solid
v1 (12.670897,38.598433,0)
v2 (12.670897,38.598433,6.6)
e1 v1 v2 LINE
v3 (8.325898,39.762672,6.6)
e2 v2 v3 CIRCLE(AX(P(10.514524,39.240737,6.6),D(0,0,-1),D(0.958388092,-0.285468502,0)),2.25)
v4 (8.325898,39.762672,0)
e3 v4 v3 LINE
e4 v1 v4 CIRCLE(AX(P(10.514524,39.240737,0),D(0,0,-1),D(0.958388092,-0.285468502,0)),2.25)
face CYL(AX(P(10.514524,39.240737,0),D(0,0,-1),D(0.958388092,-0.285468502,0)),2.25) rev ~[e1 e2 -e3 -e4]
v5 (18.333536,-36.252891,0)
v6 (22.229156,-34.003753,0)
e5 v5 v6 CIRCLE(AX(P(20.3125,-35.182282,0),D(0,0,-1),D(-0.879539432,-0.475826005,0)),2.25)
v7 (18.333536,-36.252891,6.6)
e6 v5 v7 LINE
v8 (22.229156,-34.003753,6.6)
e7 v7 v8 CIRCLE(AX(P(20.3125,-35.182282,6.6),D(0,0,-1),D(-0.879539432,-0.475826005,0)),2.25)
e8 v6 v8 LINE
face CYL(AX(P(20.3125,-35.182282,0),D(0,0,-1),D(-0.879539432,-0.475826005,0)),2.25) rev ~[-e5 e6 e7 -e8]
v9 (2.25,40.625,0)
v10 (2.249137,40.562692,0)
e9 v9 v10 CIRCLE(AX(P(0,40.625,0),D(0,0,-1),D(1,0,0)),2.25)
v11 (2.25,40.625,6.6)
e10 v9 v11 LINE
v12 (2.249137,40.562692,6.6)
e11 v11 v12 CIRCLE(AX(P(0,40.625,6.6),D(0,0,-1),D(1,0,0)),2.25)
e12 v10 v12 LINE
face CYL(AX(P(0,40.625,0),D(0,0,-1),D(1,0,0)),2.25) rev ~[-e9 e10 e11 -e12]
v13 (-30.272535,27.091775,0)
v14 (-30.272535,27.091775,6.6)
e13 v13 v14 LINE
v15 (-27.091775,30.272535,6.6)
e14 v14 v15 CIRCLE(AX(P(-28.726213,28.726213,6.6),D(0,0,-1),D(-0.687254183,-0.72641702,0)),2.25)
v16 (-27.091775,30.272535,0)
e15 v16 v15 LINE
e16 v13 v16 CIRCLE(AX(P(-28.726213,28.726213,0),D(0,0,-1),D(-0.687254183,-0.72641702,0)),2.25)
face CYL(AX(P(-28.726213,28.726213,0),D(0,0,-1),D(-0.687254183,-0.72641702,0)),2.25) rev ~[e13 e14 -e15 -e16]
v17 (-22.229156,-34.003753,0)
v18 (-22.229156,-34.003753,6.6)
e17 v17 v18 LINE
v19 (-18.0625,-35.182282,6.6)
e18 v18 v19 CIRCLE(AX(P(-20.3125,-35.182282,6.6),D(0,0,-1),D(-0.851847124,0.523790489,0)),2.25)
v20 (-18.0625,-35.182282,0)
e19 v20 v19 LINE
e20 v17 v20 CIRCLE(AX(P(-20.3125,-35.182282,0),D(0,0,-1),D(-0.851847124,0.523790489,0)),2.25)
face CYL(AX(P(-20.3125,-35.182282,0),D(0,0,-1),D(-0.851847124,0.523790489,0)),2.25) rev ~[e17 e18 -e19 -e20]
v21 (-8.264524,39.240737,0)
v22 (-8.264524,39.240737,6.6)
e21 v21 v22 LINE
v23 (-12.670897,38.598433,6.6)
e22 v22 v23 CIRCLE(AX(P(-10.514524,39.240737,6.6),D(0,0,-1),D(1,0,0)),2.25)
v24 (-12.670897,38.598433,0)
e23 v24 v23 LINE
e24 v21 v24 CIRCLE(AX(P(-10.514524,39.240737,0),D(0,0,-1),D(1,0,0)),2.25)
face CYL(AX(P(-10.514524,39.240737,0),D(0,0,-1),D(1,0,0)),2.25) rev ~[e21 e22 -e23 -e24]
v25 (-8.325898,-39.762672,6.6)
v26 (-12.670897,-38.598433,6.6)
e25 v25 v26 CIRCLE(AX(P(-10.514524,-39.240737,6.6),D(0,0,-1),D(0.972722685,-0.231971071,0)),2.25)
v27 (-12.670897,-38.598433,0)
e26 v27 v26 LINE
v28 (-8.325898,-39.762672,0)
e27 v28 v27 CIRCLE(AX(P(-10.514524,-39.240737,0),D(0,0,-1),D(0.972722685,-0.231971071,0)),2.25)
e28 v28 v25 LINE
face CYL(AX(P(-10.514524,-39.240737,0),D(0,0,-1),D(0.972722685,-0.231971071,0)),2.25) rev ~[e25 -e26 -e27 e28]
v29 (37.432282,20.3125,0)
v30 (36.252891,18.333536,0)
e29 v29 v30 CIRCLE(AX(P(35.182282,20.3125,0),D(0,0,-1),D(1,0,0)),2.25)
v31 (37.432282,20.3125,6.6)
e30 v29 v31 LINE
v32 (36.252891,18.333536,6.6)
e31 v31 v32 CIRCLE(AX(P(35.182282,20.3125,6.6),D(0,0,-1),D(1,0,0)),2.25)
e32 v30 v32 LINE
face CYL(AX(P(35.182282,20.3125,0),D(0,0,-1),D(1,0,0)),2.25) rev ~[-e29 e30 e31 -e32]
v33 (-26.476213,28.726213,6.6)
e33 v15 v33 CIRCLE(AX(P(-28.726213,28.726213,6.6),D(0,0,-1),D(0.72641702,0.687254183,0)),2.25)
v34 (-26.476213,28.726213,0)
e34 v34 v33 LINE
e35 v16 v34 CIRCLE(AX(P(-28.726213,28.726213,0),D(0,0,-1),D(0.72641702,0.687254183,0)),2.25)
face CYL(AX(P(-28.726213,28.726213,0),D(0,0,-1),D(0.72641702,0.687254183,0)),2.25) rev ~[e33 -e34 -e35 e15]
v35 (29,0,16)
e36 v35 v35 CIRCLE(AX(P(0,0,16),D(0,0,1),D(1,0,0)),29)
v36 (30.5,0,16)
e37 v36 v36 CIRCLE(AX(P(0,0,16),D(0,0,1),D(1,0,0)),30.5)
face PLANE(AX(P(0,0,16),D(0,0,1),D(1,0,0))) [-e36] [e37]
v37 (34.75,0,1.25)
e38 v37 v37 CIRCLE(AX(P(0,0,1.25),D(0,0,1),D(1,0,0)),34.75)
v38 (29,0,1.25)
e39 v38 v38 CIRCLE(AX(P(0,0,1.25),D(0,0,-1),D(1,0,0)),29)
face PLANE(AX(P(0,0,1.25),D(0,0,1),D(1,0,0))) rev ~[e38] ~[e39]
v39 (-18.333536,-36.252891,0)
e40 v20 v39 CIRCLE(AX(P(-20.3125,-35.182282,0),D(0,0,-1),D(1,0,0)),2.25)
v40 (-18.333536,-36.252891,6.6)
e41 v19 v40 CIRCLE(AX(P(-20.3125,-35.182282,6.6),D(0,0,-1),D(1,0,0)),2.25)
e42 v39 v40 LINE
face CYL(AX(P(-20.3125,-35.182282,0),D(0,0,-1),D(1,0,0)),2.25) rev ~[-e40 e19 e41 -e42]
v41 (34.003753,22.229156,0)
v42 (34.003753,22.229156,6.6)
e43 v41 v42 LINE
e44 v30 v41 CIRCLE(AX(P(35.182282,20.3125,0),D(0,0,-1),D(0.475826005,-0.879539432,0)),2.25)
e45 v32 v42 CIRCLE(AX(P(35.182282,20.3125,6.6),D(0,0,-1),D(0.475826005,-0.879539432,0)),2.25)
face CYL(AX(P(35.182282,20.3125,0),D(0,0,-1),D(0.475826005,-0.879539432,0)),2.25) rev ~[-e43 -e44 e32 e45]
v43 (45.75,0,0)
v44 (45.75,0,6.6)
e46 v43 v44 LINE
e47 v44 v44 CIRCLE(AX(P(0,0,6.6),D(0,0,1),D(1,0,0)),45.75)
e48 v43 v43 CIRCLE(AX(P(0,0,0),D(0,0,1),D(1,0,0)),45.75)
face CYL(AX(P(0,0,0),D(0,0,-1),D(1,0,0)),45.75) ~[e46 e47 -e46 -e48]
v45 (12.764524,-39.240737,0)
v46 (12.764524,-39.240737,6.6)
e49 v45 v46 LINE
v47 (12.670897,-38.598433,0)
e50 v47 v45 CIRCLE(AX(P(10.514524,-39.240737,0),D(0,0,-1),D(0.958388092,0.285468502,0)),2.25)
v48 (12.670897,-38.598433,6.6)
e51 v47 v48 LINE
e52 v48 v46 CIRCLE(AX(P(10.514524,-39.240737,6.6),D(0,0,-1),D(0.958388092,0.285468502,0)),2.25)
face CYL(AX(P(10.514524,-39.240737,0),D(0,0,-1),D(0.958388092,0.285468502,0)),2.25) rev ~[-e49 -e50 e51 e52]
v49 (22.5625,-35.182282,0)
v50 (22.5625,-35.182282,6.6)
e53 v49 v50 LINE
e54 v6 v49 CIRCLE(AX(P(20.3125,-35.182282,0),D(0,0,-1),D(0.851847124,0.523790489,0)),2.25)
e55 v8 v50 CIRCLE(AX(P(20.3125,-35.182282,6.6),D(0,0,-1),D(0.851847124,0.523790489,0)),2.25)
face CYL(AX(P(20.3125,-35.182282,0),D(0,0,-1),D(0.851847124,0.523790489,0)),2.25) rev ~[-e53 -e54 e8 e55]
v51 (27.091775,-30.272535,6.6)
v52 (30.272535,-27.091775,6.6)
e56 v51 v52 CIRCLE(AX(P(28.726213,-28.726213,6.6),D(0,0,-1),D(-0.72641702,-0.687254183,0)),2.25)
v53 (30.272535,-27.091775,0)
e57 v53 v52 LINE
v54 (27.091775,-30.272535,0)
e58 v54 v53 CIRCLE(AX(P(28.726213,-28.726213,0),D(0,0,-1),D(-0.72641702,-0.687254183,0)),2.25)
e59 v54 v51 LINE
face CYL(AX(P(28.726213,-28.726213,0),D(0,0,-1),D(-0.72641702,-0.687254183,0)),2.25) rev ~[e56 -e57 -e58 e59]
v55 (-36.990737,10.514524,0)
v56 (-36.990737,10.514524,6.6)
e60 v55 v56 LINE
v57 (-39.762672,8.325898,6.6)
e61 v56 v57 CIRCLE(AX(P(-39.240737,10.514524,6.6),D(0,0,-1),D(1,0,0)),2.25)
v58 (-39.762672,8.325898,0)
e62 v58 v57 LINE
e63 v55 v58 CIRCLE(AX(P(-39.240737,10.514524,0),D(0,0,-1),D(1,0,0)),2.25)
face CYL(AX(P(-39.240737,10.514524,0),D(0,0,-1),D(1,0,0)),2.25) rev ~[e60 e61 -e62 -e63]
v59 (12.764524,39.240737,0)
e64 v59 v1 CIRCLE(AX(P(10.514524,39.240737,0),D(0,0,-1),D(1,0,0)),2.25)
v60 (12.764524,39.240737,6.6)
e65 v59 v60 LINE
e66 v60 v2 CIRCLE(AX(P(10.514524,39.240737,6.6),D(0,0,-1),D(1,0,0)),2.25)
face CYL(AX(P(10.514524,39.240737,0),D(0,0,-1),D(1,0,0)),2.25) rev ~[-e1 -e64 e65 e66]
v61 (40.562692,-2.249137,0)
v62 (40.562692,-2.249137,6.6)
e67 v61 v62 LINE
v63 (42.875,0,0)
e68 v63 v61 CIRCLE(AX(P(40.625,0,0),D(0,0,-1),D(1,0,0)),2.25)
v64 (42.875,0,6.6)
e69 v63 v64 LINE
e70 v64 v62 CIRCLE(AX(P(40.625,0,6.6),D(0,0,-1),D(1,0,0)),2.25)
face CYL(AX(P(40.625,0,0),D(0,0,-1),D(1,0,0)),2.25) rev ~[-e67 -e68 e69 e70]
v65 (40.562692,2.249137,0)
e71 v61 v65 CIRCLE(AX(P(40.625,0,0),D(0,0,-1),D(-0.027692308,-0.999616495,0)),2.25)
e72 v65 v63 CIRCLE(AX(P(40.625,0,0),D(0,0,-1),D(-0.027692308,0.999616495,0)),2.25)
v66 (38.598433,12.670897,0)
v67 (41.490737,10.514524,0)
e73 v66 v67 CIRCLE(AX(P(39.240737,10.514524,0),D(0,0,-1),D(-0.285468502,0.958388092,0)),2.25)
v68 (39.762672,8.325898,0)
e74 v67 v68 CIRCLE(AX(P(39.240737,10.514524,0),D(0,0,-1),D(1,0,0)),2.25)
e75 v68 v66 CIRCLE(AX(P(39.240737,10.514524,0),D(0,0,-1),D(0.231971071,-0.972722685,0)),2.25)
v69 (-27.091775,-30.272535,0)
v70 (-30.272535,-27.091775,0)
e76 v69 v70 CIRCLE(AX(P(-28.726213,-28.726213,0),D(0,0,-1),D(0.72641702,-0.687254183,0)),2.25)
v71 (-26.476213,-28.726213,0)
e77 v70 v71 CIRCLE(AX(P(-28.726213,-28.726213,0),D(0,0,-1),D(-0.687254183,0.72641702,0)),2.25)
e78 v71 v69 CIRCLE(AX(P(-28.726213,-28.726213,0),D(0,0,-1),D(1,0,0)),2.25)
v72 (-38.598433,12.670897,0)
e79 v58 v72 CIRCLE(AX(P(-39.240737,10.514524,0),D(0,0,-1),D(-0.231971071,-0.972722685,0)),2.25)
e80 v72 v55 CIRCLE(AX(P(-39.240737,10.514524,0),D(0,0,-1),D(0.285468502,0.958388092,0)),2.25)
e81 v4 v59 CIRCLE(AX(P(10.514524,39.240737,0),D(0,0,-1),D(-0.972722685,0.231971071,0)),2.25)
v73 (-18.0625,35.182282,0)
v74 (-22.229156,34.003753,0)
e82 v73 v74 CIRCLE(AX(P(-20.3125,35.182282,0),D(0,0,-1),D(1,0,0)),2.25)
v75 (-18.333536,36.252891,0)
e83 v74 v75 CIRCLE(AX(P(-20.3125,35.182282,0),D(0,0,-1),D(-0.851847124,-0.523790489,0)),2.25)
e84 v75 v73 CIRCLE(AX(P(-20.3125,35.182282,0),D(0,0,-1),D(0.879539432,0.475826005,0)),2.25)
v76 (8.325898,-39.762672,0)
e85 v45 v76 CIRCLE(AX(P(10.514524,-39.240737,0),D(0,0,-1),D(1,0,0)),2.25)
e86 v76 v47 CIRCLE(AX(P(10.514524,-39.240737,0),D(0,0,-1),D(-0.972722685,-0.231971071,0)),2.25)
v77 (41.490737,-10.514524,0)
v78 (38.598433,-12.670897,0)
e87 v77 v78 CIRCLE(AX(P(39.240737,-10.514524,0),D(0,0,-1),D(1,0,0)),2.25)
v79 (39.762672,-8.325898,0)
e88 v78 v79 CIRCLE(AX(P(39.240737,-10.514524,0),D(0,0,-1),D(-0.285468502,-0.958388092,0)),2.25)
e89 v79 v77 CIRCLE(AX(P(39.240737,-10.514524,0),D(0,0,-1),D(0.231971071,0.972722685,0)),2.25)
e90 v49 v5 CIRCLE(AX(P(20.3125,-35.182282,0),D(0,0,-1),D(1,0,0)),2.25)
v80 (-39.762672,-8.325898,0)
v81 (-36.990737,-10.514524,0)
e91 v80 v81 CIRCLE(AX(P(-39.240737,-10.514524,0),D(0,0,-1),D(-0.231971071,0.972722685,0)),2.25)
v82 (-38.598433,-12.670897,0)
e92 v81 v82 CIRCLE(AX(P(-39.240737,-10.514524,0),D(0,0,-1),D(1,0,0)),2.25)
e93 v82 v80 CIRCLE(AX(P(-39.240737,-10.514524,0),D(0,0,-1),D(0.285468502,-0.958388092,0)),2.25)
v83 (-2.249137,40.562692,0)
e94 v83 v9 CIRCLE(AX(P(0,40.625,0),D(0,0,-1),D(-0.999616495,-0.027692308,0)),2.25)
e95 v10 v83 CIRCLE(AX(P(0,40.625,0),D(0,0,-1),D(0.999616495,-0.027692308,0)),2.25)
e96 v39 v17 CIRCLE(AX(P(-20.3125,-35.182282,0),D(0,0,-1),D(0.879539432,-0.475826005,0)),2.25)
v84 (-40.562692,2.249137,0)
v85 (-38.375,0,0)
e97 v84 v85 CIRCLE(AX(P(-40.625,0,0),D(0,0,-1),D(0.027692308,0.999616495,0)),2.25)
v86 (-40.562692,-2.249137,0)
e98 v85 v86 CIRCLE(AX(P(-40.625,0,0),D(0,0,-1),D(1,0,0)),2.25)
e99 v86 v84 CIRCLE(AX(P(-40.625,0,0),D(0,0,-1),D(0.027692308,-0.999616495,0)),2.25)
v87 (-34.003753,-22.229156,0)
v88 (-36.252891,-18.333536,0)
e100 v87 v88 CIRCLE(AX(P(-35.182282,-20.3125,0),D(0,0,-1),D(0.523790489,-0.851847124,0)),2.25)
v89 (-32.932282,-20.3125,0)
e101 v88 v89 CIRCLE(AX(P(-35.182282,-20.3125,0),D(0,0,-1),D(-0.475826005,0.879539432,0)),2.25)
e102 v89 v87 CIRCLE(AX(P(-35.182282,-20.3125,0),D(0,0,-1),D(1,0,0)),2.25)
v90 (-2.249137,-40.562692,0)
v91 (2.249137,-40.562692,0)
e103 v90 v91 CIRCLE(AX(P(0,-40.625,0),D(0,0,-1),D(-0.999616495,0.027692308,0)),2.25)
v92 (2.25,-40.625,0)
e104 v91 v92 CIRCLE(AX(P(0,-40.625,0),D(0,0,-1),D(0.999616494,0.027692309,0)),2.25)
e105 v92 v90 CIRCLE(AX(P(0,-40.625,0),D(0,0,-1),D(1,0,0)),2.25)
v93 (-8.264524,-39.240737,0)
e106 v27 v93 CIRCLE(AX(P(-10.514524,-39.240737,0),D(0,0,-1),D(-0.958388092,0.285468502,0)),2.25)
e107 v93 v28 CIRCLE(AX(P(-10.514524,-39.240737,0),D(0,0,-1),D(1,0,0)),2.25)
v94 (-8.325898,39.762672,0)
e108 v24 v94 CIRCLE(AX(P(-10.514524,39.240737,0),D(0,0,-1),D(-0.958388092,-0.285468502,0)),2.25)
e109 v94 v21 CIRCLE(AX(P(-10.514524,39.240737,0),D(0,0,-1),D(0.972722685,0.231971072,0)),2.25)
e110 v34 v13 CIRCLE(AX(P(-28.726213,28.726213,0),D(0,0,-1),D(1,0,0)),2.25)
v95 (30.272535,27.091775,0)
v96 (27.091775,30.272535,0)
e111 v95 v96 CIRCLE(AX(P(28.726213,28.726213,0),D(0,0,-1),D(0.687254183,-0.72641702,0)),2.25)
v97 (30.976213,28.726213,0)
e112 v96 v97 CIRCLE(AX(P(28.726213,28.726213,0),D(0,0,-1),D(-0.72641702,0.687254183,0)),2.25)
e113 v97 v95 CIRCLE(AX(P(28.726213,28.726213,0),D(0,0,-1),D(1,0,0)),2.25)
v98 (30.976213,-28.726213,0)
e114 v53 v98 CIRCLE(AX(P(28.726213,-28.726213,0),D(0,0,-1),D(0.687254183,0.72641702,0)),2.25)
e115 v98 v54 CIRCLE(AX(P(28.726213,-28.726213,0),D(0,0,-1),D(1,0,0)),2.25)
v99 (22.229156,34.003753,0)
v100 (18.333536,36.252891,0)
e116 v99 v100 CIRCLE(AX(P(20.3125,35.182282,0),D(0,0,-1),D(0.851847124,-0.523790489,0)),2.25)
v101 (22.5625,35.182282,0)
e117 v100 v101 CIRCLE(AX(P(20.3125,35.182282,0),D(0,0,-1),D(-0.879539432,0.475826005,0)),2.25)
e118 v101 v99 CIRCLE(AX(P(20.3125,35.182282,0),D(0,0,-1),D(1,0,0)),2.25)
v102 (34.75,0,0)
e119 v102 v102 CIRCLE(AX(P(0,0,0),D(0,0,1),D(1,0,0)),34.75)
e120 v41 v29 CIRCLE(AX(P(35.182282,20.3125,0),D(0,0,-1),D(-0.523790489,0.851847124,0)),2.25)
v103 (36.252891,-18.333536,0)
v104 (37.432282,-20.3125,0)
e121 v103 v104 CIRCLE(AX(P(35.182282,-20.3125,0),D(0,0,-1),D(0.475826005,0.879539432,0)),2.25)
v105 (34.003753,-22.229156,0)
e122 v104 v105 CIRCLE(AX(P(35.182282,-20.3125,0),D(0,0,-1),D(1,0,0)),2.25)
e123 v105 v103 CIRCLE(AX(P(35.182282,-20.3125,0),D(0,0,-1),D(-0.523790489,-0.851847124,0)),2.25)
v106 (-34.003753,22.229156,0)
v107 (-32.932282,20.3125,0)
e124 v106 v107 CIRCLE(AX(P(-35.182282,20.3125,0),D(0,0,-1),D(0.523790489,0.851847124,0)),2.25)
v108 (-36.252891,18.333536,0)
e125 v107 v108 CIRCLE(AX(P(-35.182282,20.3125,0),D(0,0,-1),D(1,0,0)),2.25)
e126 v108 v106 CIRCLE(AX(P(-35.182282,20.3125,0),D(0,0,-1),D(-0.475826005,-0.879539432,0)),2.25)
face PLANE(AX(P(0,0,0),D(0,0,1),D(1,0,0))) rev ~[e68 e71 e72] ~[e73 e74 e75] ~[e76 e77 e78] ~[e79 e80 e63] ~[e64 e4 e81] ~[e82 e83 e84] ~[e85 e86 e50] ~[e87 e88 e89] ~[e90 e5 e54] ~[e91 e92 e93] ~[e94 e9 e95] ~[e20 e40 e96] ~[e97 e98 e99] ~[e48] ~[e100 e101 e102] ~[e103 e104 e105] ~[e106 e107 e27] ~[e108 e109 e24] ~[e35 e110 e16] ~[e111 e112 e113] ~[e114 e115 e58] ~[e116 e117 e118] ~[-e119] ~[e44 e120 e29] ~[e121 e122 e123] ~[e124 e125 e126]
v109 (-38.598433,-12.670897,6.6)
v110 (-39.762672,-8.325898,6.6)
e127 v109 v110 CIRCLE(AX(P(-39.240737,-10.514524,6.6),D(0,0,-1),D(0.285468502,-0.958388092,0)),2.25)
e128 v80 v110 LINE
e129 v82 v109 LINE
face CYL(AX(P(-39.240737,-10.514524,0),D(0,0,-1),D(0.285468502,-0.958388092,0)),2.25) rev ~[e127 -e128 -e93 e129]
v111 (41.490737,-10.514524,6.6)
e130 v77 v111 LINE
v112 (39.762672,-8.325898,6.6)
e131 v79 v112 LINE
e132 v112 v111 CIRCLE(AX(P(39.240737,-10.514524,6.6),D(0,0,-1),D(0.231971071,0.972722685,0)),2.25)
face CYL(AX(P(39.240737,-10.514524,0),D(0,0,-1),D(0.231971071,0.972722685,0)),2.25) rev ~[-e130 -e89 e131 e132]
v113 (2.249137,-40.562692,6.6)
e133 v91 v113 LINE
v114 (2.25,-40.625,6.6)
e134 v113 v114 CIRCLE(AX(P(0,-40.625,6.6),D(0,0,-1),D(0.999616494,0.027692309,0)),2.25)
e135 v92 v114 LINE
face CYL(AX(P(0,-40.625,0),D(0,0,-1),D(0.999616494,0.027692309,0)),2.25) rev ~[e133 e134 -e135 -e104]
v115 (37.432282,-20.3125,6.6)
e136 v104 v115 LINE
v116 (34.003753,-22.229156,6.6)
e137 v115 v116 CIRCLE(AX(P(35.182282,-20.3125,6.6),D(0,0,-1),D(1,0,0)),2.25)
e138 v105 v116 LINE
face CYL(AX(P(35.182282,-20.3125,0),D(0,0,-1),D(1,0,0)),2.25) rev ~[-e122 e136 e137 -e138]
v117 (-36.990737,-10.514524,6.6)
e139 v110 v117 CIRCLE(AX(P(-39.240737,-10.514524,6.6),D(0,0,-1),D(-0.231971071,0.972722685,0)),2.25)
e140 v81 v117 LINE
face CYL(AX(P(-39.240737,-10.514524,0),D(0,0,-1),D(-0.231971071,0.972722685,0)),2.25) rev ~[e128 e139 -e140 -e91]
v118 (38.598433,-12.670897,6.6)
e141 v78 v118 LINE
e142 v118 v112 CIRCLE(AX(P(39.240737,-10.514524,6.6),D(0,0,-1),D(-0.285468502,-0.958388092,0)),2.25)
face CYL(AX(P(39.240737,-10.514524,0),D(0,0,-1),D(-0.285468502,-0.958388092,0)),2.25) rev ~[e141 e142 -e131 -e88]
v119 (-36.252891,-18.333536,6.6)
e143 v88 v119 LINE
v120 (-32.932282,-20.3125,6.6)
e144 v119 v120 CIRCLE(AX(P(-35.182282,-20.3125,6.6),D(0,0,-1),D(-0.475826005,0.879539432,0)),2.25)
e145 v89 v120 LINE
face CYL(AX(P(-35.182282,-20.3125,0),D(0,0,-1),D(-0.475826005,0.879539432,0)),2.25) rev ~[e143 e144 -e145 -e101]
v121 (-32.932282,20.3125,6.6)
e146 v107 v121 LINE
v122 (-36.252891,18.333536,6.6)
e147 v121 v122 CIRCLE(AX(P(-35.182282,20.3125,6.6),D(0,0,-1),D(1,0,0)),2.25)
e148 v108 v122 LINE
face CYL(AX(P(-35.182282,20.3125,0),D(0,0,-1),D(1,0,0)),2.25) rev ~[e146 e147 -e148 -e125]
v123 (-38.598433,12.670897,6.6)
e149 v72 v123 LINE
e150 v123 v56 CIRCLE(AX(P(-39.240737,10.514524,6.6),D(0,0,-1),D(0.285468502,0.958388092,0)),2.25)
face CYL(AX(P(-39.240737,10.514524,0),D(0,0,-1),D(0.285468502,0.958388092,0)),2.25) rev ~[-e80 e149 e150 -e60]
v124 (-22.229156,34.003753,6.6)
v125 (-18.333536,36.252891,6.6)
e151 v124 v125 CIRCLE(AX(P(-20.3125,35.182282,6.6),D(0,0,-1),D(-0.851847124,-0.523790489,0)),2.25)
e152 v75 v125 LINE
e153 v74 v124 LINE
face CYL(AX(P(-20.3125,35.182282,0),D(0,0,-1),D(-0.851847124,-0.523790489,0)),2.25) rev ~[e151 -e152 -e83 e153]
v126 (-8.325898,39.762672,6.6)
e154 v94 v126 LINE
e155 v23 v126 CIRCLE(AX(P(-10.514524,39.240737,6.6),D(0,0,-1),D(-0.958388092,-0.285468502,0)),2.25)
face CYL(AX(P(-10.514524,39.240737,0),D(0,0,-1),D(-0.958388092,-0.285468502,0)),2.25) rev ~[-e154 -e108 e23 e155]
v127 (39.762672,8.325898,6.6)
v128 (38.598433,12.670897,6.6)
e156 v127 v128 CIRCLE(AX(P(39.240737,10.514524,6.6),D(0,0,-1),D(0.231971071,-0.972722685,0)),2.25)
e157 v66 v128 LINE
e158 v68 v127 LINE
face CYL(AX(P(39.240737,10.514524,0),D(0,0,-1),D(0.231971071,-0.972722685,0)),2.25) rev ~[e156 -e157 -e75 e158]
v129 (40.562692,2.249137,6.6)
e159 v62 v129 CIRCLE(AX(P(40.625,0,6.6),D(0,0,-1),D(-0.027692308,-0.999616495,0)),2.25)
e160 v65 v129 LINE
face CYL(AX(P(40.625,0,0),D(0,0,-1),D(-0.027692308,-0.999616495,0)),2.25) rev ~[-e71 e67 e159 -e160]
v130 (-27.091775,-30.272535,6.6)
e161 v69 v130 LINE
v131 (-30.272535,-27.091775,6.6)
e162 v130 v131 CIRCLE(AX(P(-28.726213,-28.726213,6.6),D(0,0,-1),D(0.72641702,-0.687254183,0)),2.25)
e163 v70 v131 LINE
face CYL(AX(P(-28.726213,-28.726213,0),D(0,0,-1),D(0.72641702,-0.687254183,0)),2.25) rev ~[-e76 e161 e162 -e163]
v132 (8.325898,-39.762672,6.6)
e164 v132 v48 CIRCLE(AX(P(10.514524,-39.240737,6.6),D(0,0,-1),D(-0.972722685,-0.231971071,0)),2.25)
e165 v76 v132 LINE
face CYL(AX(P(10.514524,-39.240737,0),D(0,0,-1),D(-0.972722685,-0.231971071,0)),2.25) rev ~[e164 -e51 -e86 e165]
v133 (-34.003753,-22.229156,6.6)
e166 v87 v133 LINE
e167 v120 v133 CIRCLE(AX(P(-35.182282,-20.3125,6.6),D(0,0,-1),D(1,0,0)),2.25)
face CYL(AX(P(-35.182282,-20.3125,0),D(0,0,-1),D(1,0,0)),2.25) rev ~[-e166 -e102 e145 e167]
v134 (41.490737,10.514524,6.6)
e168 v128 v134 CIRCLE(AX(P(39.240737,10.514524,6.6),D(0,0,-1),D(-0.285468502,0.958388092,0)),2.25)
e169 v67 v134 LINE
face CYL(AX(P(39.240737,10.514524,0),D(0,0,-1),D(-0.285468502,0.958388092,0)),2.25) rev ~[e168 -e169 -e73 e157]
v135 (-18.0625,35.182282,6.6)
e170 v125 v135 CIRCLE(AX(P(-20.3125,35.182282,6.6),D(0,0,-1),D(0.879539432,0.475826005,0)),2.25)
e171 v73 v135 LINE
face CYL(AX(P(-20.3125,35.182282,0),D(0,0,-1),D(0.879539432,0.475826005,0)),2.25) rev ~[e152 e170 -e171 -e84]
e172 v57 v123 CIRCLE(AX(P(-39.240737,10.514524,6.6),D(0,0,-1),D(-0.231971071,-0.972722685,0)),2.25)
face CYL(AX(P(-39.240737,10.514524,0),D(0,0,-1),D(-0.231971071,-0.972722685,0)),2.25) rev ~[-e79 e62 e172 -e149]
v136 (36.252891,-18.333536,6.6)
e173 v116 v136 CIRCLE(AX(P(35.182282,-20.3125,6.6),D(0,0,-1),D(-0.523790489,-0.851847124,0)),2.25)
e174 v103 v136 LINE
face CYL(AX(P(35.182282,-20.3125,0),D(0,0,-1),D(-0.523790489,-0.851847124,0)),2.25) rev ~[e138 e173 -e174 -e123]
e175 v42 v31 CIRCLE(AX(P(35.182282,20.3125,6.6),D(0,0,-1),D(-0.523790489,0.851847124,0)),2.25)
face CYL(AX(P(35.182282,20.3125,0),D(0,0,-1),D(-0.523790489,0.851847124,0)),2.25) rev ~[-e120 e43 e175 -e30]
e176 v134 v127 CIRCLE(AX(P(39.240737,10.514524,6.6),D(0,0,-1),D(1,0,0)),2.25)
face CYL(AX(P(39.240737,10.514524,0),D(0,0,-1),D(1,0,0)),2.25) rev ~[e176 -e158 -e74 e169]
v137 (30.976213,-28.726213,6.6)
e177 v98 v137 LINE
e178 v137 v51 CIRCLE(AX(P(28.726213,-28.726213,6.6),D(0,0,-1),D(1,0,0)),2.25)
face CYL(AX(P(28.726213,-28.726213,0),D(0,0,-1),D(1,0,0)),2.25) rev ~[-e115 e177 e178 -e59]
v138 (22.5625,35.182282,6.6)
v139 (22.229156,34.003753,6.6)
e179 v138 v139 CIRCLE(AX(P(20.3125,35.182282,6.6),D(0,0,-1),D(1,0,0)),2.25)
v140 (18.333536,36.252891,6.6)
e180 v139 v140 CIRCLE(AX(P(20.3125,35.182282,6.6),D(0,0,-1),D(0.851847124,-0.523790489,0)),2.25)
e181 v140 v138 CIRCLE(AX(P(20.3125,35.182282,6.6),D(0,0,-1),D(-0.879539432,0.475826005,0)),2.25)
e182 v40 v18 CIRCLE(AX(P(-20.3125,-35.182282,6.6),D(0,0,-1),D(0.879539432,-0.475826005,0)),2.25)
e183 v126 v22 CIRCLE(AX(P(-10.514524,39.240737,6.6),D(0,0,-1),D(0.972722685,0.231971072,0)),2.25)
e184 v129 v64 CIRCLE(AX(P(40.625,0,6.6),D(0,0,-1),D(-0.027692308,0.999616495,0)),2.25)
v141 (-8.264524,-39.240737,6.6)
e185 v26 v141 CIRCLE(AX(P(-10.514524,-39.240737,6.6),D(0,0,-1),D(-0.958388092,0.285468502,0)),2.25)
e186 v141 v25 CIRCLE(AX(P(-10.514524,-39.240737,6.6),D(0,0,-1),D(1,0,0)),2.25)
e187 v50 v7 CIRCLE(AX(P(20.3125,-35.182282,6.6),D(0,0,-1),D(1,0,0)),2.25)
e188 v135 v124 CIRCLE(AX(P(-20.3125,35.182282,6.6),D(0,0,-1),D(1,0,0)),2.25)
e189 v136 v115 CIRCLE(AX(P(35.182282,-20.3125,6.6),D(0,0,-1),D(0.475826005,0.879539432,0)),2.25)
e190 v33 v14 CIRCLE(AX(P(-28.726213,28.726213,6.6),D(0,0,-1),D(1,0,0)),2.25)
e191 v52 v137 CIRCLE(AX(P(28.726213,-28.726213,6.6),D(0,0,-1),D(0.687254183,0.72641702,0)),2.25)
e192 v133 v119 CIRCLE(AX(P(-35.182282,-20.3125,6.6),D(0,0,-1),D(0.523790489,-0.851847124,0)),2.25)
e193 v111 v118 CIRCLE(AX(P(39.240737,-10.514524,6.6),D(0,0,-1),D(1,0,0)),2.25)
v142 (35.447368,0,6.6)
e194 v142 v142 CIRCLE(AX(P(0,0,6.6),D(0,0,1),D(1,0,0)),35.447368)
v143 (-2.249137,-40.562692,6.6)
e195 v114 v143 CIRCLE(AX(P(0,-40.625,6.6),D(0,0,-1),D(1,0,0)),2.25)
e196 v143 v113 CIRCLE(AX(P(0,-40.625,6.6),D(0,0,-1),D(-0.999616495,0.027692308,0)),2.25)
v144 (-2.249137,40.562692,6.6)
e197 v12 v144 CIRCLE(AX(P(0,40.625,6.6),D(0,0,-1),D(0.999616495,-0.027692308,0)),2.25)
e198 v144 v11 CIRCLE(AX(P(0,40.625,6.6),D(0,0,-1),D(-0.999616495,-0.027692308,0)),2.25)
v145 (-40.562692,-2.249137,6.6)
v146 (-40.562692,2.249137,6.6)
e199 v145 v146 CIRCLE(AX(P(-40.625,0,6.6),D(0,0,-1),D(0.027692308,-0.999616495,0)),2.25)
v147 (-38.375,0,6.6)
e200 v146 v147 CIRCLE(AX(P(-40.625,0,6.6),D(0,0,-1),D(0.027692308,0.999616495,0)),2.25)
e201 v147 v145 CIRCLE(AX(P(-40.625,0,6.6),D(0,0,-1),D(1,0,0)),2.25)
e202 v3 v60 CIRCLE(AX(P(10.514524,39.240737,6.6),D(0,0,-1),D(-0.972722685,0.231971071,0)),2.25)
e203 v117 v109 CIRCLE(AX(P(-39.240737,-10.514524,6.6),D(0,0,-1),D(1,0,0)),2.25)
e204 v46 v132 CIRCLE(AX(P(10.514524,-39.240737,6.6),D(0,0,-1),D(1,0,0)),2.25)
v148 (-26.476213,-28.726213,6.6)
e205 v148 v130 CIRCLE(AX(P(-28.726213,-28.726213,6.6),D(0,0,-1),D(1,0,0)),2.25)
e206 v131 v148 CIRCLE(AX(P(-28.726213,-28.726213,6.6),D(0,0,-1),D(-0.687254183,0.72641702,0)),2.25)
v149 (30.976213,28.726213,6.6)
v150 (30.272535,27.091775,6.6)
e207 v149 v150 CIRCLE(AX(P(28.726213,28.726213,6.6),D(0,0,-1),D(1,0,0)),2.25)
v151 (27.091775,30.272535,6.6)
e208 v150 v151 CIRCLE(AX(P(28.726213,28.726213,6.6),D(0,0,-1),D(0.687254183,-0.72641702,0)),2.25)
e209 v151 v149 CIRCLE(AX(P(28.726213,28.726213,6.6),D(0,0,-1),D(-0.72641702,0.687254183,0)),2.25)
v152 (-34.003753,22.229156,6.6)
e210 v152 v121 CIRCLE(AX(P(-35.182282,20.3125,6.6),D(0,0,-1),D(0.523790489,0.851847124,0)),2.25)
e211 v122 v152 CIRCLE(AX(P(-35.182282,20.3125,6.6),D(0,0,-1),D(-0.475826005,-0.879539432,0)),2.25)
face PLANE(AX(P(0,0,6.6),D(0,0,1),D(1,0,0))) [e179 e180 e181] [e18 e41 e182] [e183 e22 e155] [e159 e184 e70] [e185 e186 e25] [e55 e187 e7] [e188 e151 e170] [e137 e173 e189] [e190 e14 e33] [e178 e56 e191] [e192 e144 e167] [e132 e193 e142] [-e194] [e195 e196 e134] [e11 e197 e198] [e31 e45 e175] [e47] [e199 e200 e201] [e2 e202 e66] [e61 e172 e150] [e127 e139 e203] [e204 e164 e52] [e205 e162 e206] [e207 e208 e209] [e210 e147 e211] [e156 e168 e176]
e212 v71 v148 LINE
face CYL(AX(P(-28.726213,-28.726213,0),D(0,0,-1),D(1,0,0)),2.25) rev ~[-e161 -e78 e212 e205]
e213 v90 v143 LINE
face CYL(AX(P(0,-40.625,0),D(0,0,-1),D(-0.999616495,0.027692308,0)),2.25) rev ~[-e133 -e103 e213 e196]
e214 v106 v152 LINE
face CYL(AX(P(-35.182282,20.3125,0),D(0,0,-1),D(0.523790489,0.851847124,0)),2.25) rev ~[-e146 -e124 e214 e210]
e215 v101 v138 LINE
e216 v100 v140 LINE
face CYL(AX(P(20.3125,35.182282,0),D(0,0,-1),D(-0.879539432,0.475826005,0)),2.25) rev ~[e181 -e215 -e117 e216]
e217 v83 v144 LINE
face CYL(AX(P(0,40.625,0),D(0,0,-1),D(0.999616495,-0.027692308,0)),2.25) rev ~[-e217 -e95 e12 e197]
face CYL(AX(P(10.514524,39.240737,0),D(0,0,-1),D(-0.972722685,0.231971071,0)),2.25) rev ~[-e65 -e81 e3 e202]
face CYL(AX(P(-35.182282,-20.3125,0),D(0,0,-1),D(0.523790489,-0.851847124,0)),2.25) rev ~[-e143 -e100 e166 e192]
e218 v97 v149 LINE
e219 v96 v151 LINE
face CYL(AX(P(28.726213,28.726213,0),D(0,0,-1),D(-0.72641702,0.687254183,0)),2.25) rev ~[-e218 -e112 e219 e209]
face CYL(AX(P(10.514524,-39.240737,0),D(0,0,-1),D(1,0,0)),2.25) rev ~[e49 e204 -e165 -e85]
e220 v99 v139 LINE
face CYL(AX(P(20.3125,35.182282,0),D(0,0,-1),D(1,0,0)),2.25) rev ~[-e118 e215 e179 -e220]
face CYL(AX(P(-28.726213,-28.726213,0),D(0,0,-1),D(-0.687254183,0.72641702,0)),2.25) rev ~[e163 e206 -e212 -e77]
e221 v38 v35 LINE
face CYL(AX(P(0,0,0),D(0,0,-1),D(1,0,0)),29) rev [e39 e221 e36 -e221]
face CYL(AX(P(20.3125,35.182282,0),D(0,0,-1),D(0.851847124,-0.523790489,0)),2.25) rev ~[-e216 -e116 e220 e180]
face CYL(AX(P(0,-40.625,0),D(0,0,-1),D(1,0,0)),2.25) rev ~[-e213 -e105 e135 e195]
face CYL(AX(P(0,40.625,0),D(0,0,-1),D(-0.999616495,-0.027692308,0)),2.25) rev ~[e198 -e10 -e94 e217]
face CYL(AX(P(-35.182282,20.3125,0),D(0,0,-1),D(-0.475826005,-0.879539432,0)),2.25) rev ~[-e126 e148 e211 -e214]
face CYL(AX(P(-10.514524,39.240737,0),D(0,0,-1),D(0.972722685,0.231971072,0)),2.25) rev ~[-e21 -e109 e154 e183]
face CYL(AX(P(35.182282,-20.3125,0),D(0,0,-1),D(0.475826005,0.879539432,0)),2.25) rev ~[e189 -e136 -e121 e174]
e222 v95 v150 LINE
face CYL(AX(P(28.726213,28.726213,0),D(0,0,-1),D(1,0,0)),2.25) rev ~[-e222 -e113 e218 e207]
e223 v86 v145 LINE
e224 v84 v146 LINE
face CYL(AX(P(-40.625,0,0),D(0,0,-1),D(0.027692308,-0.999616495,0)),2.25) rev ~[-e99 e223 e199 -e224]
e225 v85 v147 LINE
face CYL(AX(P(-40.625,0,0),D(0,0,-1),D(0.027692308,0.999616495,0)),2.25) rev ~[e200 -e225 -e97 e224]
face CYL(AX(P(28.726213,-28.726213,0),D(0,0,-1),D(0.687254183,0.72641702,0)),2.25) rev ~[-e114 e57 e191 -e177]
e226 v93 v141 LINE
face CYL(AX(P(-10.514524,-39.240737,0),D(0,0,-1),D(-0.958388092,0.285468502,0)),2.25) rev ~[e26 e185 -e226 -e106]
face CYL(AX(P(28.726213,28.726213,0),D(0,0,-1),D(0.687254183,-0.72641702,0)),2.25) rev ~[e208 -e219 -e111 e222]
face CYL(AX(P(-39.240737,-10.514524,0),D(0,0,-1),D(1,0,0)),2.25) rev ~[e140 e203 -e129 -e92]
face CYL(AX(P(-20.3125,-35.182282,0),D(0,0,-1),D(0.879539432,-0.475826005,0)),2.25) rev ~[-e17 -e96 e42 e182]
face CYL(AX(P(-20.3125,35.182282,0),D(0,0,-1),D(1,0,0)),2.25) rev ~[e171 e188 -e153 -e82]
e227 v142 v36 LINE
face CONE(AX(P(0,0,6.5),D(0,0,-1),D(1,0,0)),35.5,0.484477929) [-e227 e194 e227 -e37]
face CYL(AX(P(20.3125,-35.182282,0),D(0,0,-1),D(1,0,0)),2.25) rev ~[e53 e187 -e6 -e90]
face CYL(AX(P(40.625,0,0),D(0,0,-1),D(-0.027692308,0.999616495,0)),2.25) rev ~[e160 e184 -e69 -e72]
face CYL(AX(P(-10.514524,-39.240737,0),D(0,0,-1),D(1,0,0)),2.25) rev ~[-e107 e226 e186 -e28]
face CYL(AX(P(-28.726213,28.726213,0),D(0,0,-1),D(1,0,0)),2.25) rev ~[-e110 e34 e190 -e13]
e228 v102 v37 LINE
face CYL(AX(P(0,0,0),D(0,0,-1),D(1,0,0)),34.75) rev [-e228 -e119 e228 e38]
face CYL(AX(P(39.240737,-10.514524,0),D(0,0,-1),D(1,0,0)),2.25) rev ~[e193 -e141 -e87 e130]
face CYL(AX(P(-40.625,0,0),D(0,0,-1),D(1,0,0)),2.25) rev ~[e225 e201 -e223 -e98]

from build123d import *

# Parameters (mm, degrees)
F0_R     = 45.75
F0_R_2   = 35.5
F0_R_3   = 29
F1_DEPTH = 6.6
F3_DEPTH = 16
F5_R     = 34.75
F6_DEPTH = 1.25


# Not quite as in the source:
# - a fillet or chamfer that OpenCascade refuses, or shapes differently, is made with other operations: its cross-section is extruded or revolved along the edge and cut away or added
# - the program builds the solid bodies; features that only make, move or delete a surface that nothing else refers to are left out


with BuildPart() as f1:
    # F0 (on Top) → F1 (new body)
    with BuildSketch(Plane.XY):
        Circle(F0_R)
        with BuildLine():
            ThreePointArc((39.7626716036, 8.3258976659), (40.2774474933, 5.3026265589), (40.5626923077, 2.2491371126))
            ThreePointArc((40.5626923077, 2.2491371126), (42.1938065037, 1.6128689202), (42.875, 0))
            ThreePointArc((42.875, 0), (42.1938065037, -1.6128689202), (40.5626923077, -2.2491371126))
            ThreePointArc((40.5626923077, -2.2491371126), (40.2774474933, -5.3026265589), (39.7626716036, -8.3258976659))
            ThreePointArc((39.7626716036, -8.3258976659), (41.0066434783, -9.1202234435), (41.490736693, -10.5145237073))
            ThreePointArc((41.490736693, -10.5145237073), (40.5856002009, -12.3183646496), (38.598432564, -12.6708969138))
            ThreePointArc((38.598432564, -12.6708969138), (37.5326060083, -15.5465144398), (36.2528905407, -18.3335362777))
            ThreePointArc((36.2528905407, -18.3335362777), (37.115073941, -19.1606252568), (37.4322820287, -20.3125))
            ThreePointArc((37.4322820287, -20.3125), (36.2801915533, -22.2764487457), (34.003753428, -22.22915603))
            ThreePointArc((34.003753428, -22.22915603), (32.2299794493, -24.7309330535), (30.2725348981, -27.0917746898))
            ThreePointArc((30.2725348981, -27.0917746898), (30.7928194193, -27.8364726592), (30.9762129857, -28.7262129857))
            ThreePointArc((30.9762129857, -28.7262129857), (29.5583829906, -30.8166658273), (27.0917746898, -30.2725348981))
            ThreePointArc((27.0917746898, -30.2725348981), (24.7309330535, -32.2299794493), (22.22915603, -34.003753428))
            ThreePointArc((22.22915603, -34.003753428), (22.477560746, -34.5698998227), (22.5625, -35.1822820287))
            ThreePointArc((22.5625, -35.1822820287), (20.8646918257, -37.3634707385), (18.3335362777, -36.2528905407))
            ThreePointArc((18.3335362777, -36.2528905407), (15.5465144398, -37.5326060083), (12.6708969138, -38.598432564))
            ThreePointArc((12.6708969138, -38.598432564), (12.740993976, -38.9161906367), (12.7645237073, -39.240736693))
            ThreePointArc((12.7645237073, -39.240736693), (10.7772891986, -41.4753405274), (8.3258976659, -39.7626716036))
            ThreePointArc((8.3258976659, -39.7626716036), (5.3026265589, -40.2774474933), (2.2491371126, -40.5626923077))
            ThreePointArc((2.2491371126, -40.5626923077), (2.2497842678, -40.5938431665), (2.25, -40.625))
            ThreePointArc((2.25, -40.625), (-0.0311568335, -42.8747842678), (-2.2491371126, -40.5626923077))
            ThreePointArc((-2.2491371126, -40.5626923077), (-5.3026265589, -40.2774474933), (-8.3258976659, -39.7626716036))
            ThreePointArc((-8.3258976659, -39.7626716036), (-11.0968665588, -41.4140698021), (-12.6708969138, -38.598432564))
            ThreePointArc((-12.6708969138, -38.598432564), (-15.5465144398, -37.5326060083), (-18.3335362777, -36.2528905407))
            ThreePointArc((-18.3335362777, -36.2528905407), (-21.4375, -37.1308391873), (-22.22915603, -34.003753428))
            ThreePointArc((-22.22915603, -34.003753428), (-24.7309330535, -32.2299794493), (-27.0917746898, -30.2725348981))
            ThreePointArc((-27.0917746898, -30.2725348981), (-30.3172032434, -30.3172032434), (-30.2725348981, -27.0917746898))
            ThreePointArc((-30.2725348981, -27.0917746898), (-32.2299794493, -24.7309330535), (-34.003753428, -22.22915603))
            ThreePointArc((-34.003753428, -22.22915603), (-37.1308391873, -21.4375), (-36.2528905407, -18.3335362777))
            ThreePointArc((-36.2528905407, -18.3335362777), (-37.5326060083, -15.5465144398), (-38.598432564, -12.6708969138))
            ThreePointArc((-38.598432564, -12.6708969138), (-41.4140698021, -11.0968665588), (-39.7626716036, -8.3258976659))
            ThreePointArc((-39.7626716036, -8.3258976659), (-40.2774474933, -5.3026265589), (-40.5626923077, -2.2491371126))
            ThreePointArc((-40.5626923077, -2.2491371126), (-42.875, 0), (-40.5626923077, 2.2491371126))
            ThreePointArc((-40.5626923077, 2.2491371126), (-40.2774474933, 5.3026265589), (-39.7626716036, 8.3258976659))
            ThreePointArc((-39.7626716036, 8.3258976659), (-41.4140698021, 11.0968665588), (-38.598432564, 12.6708969138))
            ThreePointArc((-38.598432564, 12.6708969138), (-37.5326060083, 15.5465144398), (-36.2528905407, 18.3335362777))
            ThreePointArc((-36.2528905407, 18.3335362777), (-37.1308391873, 21.4375), (-34.003753428, 22.22915603))
            ThreePointArc((-34.003753428, 22.22915603), (-32.2299794493, 24.7309330535), (-30.2725348981, 27.0917746898))
            ThreePointArc((-30.2725348981, 27.0917746898), (-30.3172032434, 30.3172032434), (-27.0917746898, 30.2725348981))
            ThreePointArc((-27.0917746898, 30.2725348981), (-24.7309330535, 32.2299794493), (-22.22915603, 34.003753428))
            ThreePointArc((-22.22915603, 34.003753428), (-21.4375, 37.1308391873), (-18.3335362777, 36.2528905407))
            ThreePointArc((-18.3335362777, 36.2528905407), (-15.5465144398, 37.5326060083), (-12.6708969138, 38.598432564))
            ThreePointArc((-12.6708969138, 38.598432564), (-11.0968665588, 41.4140698021), (-8.3258976659, 39.7626716036))
            ThreePointArc((-8.3258976659, 39.7626716036), (-5.3026265589, 40.2774474933), (-2.2491371126, 40.5626923077))
            ThreePointArc((-2.2491371126, 40.5626923077), (-0.0311568335, 42.8747842678), (2.25, 40.625))
            ThreePointArc((2.25, 40.625), (2.2497842678, 40.5938431665), (2.2491371126, 40.5626923077))
            ThreePointArc((2.2491371126, 40.5626923077), (5.3026265589, 40.2774474933), (8.3258976659, 39.7626716036))
            ThreePointArc((8.3258976659, 39.7626716036), (10.7772891986, 41.4753405274), (12.7645237073, 39.240736693))
            ThreePointArc((12.7645237073, 39.240736693), (12.740993976, 38.9161906367), (12.6708969138, 38.598432564))
            ThreePointArc((12.6708969138, 38.598432564), (15.5465144398, 37.5326060083), (18.3335362777, 36.2528905407))
            ThreePointArc((18.3335362777, 36.2528905407), (20.8646918257, 37.3634707385), (22.5625, 35.1822820287))
            ThreePointArc((22.5625, 35.1822820287), (22.477560746, 34.5698998227), (22.22915603, 34.003753428))
            ThreePointArc((22.22915603, 34.003753428), (24.7309330535, 32.2299794493), (27.0917746898, 30.2725348981))
            ThreePointArc((27.0917746898, 30.2725348981), (29.5583829906, 30.8166658273), (30.9762129857, 28.7262129857))
            ThreePointArc((30.9762129857, 28.7262129857), (30.7928194193, 27.8364726592), (30.2725348981, 27.0917746898))
            ThreePointArc((30.2725348981, 27.0917746898), (32.2299794493, 24.7309330535), (34.003753428, 22.22915603))
            ThreePointArc((34.003753428, 22.22915603), (36.2801915533, 22.2764487457), (37.4322820287, 20.3125))
            ThreePointArc((37.4322820287, 20.3125), (37.115073941, 19.1606252568), (36.2528905407, 18.3335362777))
            ThreePointArc((36.2528905407, 18.3335362777), (37.5326060083, 15.5465144398), (38.598432564, 12.6708969138))
            ThreePointArc((38.598432564, 12.6708969138), (40.5856002009, 12.3183646496), (41.490736693, 10.5145237073))
            ThreePointArc((41.490736693, 10.5145237073), (41.0066434783, 9.1202234435), (39.7626716036, 8.3258976659))
        make_face(mode=Mode.SUBTRACT)
        with BuildLine():
            ThreePointArc((40.5626923077, -2.2491371126), (38.375, 0), (40.5626923077, 2.2491371126))
            ThreePointArc((40.5626923077, 2.2491371126), (40.2774474933, 5.3026265589), (39.7626716036, 8.3258976659))
            ThreePointArc((39.7626716036, 8.3258976659), (37.0674035838, 9.9321808558), (38.598432564, 12.6708969138))
            ThreePointArc((38.598432564, 12.6708969138), (37.5326060083, 15.5465144398), (36.2528905407, 18.3335362777))
            ThreePointArc((36.2528905407, 18.3335362777), (33.2337248702, 19.1875), (34.003753428, 22.22915603))
            ThreePointArc((34.003753428, 22.22915603), (32.2299794493, 24.7309330535), (30.2725348981, 27.0917746898))
            ThreePointArc((30.2725348981, 27.0917746898), (27.135222728, 27.135222728), (27.0917746898, 30.2725348981))
            ThreePointArc((27.0917746898, 30.2725348981), (24.7309330535, 32.2299794493), (22.22915603, 34.003753428))
            ThreePointArc((22.22915603, 34.003753428), (19.1875, 33.2337248702), (18.3335362777, 36.2528905407))
            ThreePointArc((18.3335362777, 36.2528905407), (15.5465144398, 37.5326060083), (12.6708969138, 38.598432564))
            ThreePointArc((12.6708969138, 38.598432564), (9.9321808558, 37.0674035838), (8.3258976659, 39.7626716036))
            ThreePointArc((8.3258976659, 39.7626716036), (5.3026265589, 40.2774474933), (2.2491371126, 40.5626923077))
            ThreePointArc((2.2491371126, 40.5626923077), (0, 38.375), (-2.2491371126, 40.5626923077))
            ThreePointArc((-2.2491371126, 40.5626923077), (-5.3026265589, 40.2774474933), (-8.3258976659, 39.7626716036))
            ThreePointArc((-8.3258976659, 39.7626716036), (-8.2799198729, 39.5035021843), (-8.2645237073, 39.240736693))
            ThreePointArc((-8.2645237073, 39.240736693), (-10.189977651, 37.0142664243), (-12.6708969138, 38.598432564))
            ThreePointArc((-12.6708969138, 38.598432564), (-15.5465144398, 37.5326060083), (-18.3335362777, 36.2528905407))
            ThreePointArc((-18.3335362777, 36.2528905407), (-18.1313112902, 35.7344738545), (-18.0625, 35.1822820287))
            ThreePointArc((-18.0625, 35.1822820287), (-19.700117794, 33.0172212828), (-22.22915603, 34.003753428))
            ThreePointArc((-22.22915603, 34.003753428), (-24.7309330535, 32.2299794493), (-27.0917746898, 30.2725348981))
            ThreePointArc((-27.0917746898, 30.2725348981), (-26.6357601441, 29.5583829906), (-26.4762129857, 28.7262129857))
            ThreePointArc((-26.4762129857, 28.7262129857), (-27.8364726592, 26.6596065521), (-30.2725348981, 27.0917746898))
            ThreePointArc((-30.2725348981, 27.0917746898), (-32.2299794493, 24.7309330535), (-34.003753428, 22.22915603))
            ThreePointArc((-34.003753428, 22.22915603), (-33.218333283, 21.4104095246), (-32.9322820287, 20.3125))
            ThreePointArc((-32.9322820287, 20.3125), (-34.0304072855, 18.3797080878), (-36.2528905407, 18.3335362777))
            ThreePointArc((-36.2528905407, 18.3335362777), (-37.5326060083, 15.5465144398), (-38.598432564, 12.6708969138))
            ThreePointArc((-38.598432564, 12.6708969138), (-37.4368957507, 11.8593872152), (-36.990736693, 10.5145237073))
            ThreePointArc((-36.990736693, 10.5145237073), (-37.8464364292, 8.748616922), (-39.7626716036, 8.3258976659))
            ThreePointArc((-39.7626716036, 8.3258976659), (-40.2774474933, 5.3026265589), (-40.5626923077, 2.2491371126))
            ThreePointArc((-40.5626923077, 2.2491371126), (-39.0121310798, 1.5688065037), (-38.375, 0))
            ThreePointArc((-38.375, 0), (-39.0121310798, -1.5688065037), (-40.5626923077, -2.2491371126))
            ThreePointArc((-40.5626923077, -2.2491371126), (-40.2774474933, -5.3026265589), (-39.7626716036, -8.3258976659))
            ThreePointArc((-39.7626716036, -8.3258976659), (-37.8464364292, -8.748616922), (-36.990736693, -10.5145237073))
            ThreePointArc((-36.990736693, -10.5145237073), (-37.4368957507, -11.8593872152), (-38.598432564, -12.6708969138))
            ThreePointArc((-38.598432564, -12.6708969138), (-37.5326060083, -15.5465144398), (-36.2528905407, -18.3335362777))
            ThreePointArc((-36.2528905407, -18.3335362777), (-34.0304072855, -18.3797080878), (-32.9322820287, -20.3125))
            ThreePointArc((-32.9322820287, -20.3125), (-33.218333283, -21.4104095246), (-34.003753428, -22.22915603))
            ThreePointArc((-34.003753428, -22.22915603), (-32.2299794493, -24.7309330535), (-30.2725348981, -27.0917746898))
            ThreePointArc((-30.2725348981, -27.0917746898), (-27.8364726592, -26.6596065521), (-26.4762129857, -28.7262129857))
            ThreePointArc((-26.4762129857, -28.7262129857), (-26.6357601441, -29.5583829906), (-27.0917746898, -30.2725348981))
            ThreePointArc((-27.0917746898, -30.2725348981), (-24.7309330535, -32.2299794493), (-22.22915603, -34.003753428))
            ThreePointArc((-22.22915603, -34.003753428), (-19.700117794, -33.0172212828), (-18.0625, -35.1822820287))
            ThreePointArc((-18.0625, -35.1822820287), (-18.1313112902, -35.7344738545), (-18.3335362777, -36.2528905407))
            ThreePointArc((-18.3335362777, -36.2528905407), (-15.5465144398, -37.5326060083), (-12.6708969138, -38.598432564))
            ThreePointArc((-12.6708969138, -38.598432564), (-10.189977651, -37.0142664243), (-8.2645237073, -39.240736693))
            ThreePointArc((-8.2645237073, -39.240736693), (-8.2799198729, -39.5035021843), (-8.3258976659, -39.7626716036))
            ThreePointArc((-8.3258976659, -39.7626716036), (-5.3026265589, -40.2774474933), (-2.2491371126, -40.5626923077))
            ThreePointArc((-2.2491371126, -40.5626923077), (0, -38.375), (2.2491371126, -40.5626923077))
            ThreePointArc((2.2491371126, -40.5626923077), (5.3026265589, -40.2774474933), (8.3258976659, -39.7626716036))
            ThreePointArc((8.3258976659, -39.7626716036), (9.9321808558, -37.0674035838), (12.6708969138, -38.598432564))
            ThreePointArc((12.6708969138, -38.598432564), (15.5465144398, -37.5326060083), (18.3335362777, -36.2528905407))
            ThreePointArc((18.3335362777, -36.2528905407), (19.1875, -33.2337248702), (22.22915603, -34.003753428))
            ThreePointArc((22.22915603, -34.003753428), (24.7309330535, -32.2299794493), (27.0917746898, -30.2725348981))
            ThreePointArc((27.0917746898, -30.2725348981), (27.135222728, -27.135222728), (30.2725348981, -27.0917746898))
            ThreePointArc((30.2725348981, -27.0917746898), (32.2299794493, -24.7309330535), (34.003753428, -22.22915603))
            ThreePointArc((34.003753428, -22.22915603), (33.2337248702, -19.1875), (36.2528905407, -18.3335362777))
            ThreePointArc((36.2528905407, -18.3335362777), (37.5326060083, -15.5465144398), (38.598432564, -12.6708969138))
            ThreePointArc((38.598432564, -12.6708969138), (37.0674035838, -9.9321808558), (39.7626716036, -8.3258976659))
            ThreePointArc((39.7626716036, -8.3258976659), (40.2774474933, -5.3026265589), (40.5626923077, -2.2491371126))
        make_face()
        Circle(F0_R_2, mode=Mode.SUBTRACT)
        Circle(F0_R_2)
        Circle(F0_R_3, mode=Mode.SUBTRACT)
    extrude(amount=F1_DEPTH)

    # F0 (on Top) → F3 (join)
    with BuildSketch(Plane.XY):
        Circle(F0_R_2)
        Circle(F0_R_3, mode=Mode.SUBTRACT)
    extrude(amount=F3_DEPTH)

    # F4: chamfer of 5 x 9.5 on 1 edges, made by hand


with BuildPart() as f4_tool2:
    # F4_s3 → F4_t4 (revolve)
    with BuildSketch(Plane.XZ):
        Polygon((35.5, 6.5), (30.5, 16), (35.5, 16), align=None)
    revolve(axis=Axis((0, 0, 16), (0, 0, 1)))

    split(bisect_by=Plane.XY.offset(6.6), keep=Keep.TOP)


with BuildPart() as f1_1:
    add(f1.part)

    # F4_t1: cut F4_tool2
    add(f4_tool2.part, mode=Mode.SUBTRACT)

    # F5 (on Top) → F6 (cut)
    with BuildSketch(Plane.XY):
        Circle(F5_R)
    extrude(amount=F6_DEPTH, mode=Mode.SUBTRACT)


solid = f1_1.part
